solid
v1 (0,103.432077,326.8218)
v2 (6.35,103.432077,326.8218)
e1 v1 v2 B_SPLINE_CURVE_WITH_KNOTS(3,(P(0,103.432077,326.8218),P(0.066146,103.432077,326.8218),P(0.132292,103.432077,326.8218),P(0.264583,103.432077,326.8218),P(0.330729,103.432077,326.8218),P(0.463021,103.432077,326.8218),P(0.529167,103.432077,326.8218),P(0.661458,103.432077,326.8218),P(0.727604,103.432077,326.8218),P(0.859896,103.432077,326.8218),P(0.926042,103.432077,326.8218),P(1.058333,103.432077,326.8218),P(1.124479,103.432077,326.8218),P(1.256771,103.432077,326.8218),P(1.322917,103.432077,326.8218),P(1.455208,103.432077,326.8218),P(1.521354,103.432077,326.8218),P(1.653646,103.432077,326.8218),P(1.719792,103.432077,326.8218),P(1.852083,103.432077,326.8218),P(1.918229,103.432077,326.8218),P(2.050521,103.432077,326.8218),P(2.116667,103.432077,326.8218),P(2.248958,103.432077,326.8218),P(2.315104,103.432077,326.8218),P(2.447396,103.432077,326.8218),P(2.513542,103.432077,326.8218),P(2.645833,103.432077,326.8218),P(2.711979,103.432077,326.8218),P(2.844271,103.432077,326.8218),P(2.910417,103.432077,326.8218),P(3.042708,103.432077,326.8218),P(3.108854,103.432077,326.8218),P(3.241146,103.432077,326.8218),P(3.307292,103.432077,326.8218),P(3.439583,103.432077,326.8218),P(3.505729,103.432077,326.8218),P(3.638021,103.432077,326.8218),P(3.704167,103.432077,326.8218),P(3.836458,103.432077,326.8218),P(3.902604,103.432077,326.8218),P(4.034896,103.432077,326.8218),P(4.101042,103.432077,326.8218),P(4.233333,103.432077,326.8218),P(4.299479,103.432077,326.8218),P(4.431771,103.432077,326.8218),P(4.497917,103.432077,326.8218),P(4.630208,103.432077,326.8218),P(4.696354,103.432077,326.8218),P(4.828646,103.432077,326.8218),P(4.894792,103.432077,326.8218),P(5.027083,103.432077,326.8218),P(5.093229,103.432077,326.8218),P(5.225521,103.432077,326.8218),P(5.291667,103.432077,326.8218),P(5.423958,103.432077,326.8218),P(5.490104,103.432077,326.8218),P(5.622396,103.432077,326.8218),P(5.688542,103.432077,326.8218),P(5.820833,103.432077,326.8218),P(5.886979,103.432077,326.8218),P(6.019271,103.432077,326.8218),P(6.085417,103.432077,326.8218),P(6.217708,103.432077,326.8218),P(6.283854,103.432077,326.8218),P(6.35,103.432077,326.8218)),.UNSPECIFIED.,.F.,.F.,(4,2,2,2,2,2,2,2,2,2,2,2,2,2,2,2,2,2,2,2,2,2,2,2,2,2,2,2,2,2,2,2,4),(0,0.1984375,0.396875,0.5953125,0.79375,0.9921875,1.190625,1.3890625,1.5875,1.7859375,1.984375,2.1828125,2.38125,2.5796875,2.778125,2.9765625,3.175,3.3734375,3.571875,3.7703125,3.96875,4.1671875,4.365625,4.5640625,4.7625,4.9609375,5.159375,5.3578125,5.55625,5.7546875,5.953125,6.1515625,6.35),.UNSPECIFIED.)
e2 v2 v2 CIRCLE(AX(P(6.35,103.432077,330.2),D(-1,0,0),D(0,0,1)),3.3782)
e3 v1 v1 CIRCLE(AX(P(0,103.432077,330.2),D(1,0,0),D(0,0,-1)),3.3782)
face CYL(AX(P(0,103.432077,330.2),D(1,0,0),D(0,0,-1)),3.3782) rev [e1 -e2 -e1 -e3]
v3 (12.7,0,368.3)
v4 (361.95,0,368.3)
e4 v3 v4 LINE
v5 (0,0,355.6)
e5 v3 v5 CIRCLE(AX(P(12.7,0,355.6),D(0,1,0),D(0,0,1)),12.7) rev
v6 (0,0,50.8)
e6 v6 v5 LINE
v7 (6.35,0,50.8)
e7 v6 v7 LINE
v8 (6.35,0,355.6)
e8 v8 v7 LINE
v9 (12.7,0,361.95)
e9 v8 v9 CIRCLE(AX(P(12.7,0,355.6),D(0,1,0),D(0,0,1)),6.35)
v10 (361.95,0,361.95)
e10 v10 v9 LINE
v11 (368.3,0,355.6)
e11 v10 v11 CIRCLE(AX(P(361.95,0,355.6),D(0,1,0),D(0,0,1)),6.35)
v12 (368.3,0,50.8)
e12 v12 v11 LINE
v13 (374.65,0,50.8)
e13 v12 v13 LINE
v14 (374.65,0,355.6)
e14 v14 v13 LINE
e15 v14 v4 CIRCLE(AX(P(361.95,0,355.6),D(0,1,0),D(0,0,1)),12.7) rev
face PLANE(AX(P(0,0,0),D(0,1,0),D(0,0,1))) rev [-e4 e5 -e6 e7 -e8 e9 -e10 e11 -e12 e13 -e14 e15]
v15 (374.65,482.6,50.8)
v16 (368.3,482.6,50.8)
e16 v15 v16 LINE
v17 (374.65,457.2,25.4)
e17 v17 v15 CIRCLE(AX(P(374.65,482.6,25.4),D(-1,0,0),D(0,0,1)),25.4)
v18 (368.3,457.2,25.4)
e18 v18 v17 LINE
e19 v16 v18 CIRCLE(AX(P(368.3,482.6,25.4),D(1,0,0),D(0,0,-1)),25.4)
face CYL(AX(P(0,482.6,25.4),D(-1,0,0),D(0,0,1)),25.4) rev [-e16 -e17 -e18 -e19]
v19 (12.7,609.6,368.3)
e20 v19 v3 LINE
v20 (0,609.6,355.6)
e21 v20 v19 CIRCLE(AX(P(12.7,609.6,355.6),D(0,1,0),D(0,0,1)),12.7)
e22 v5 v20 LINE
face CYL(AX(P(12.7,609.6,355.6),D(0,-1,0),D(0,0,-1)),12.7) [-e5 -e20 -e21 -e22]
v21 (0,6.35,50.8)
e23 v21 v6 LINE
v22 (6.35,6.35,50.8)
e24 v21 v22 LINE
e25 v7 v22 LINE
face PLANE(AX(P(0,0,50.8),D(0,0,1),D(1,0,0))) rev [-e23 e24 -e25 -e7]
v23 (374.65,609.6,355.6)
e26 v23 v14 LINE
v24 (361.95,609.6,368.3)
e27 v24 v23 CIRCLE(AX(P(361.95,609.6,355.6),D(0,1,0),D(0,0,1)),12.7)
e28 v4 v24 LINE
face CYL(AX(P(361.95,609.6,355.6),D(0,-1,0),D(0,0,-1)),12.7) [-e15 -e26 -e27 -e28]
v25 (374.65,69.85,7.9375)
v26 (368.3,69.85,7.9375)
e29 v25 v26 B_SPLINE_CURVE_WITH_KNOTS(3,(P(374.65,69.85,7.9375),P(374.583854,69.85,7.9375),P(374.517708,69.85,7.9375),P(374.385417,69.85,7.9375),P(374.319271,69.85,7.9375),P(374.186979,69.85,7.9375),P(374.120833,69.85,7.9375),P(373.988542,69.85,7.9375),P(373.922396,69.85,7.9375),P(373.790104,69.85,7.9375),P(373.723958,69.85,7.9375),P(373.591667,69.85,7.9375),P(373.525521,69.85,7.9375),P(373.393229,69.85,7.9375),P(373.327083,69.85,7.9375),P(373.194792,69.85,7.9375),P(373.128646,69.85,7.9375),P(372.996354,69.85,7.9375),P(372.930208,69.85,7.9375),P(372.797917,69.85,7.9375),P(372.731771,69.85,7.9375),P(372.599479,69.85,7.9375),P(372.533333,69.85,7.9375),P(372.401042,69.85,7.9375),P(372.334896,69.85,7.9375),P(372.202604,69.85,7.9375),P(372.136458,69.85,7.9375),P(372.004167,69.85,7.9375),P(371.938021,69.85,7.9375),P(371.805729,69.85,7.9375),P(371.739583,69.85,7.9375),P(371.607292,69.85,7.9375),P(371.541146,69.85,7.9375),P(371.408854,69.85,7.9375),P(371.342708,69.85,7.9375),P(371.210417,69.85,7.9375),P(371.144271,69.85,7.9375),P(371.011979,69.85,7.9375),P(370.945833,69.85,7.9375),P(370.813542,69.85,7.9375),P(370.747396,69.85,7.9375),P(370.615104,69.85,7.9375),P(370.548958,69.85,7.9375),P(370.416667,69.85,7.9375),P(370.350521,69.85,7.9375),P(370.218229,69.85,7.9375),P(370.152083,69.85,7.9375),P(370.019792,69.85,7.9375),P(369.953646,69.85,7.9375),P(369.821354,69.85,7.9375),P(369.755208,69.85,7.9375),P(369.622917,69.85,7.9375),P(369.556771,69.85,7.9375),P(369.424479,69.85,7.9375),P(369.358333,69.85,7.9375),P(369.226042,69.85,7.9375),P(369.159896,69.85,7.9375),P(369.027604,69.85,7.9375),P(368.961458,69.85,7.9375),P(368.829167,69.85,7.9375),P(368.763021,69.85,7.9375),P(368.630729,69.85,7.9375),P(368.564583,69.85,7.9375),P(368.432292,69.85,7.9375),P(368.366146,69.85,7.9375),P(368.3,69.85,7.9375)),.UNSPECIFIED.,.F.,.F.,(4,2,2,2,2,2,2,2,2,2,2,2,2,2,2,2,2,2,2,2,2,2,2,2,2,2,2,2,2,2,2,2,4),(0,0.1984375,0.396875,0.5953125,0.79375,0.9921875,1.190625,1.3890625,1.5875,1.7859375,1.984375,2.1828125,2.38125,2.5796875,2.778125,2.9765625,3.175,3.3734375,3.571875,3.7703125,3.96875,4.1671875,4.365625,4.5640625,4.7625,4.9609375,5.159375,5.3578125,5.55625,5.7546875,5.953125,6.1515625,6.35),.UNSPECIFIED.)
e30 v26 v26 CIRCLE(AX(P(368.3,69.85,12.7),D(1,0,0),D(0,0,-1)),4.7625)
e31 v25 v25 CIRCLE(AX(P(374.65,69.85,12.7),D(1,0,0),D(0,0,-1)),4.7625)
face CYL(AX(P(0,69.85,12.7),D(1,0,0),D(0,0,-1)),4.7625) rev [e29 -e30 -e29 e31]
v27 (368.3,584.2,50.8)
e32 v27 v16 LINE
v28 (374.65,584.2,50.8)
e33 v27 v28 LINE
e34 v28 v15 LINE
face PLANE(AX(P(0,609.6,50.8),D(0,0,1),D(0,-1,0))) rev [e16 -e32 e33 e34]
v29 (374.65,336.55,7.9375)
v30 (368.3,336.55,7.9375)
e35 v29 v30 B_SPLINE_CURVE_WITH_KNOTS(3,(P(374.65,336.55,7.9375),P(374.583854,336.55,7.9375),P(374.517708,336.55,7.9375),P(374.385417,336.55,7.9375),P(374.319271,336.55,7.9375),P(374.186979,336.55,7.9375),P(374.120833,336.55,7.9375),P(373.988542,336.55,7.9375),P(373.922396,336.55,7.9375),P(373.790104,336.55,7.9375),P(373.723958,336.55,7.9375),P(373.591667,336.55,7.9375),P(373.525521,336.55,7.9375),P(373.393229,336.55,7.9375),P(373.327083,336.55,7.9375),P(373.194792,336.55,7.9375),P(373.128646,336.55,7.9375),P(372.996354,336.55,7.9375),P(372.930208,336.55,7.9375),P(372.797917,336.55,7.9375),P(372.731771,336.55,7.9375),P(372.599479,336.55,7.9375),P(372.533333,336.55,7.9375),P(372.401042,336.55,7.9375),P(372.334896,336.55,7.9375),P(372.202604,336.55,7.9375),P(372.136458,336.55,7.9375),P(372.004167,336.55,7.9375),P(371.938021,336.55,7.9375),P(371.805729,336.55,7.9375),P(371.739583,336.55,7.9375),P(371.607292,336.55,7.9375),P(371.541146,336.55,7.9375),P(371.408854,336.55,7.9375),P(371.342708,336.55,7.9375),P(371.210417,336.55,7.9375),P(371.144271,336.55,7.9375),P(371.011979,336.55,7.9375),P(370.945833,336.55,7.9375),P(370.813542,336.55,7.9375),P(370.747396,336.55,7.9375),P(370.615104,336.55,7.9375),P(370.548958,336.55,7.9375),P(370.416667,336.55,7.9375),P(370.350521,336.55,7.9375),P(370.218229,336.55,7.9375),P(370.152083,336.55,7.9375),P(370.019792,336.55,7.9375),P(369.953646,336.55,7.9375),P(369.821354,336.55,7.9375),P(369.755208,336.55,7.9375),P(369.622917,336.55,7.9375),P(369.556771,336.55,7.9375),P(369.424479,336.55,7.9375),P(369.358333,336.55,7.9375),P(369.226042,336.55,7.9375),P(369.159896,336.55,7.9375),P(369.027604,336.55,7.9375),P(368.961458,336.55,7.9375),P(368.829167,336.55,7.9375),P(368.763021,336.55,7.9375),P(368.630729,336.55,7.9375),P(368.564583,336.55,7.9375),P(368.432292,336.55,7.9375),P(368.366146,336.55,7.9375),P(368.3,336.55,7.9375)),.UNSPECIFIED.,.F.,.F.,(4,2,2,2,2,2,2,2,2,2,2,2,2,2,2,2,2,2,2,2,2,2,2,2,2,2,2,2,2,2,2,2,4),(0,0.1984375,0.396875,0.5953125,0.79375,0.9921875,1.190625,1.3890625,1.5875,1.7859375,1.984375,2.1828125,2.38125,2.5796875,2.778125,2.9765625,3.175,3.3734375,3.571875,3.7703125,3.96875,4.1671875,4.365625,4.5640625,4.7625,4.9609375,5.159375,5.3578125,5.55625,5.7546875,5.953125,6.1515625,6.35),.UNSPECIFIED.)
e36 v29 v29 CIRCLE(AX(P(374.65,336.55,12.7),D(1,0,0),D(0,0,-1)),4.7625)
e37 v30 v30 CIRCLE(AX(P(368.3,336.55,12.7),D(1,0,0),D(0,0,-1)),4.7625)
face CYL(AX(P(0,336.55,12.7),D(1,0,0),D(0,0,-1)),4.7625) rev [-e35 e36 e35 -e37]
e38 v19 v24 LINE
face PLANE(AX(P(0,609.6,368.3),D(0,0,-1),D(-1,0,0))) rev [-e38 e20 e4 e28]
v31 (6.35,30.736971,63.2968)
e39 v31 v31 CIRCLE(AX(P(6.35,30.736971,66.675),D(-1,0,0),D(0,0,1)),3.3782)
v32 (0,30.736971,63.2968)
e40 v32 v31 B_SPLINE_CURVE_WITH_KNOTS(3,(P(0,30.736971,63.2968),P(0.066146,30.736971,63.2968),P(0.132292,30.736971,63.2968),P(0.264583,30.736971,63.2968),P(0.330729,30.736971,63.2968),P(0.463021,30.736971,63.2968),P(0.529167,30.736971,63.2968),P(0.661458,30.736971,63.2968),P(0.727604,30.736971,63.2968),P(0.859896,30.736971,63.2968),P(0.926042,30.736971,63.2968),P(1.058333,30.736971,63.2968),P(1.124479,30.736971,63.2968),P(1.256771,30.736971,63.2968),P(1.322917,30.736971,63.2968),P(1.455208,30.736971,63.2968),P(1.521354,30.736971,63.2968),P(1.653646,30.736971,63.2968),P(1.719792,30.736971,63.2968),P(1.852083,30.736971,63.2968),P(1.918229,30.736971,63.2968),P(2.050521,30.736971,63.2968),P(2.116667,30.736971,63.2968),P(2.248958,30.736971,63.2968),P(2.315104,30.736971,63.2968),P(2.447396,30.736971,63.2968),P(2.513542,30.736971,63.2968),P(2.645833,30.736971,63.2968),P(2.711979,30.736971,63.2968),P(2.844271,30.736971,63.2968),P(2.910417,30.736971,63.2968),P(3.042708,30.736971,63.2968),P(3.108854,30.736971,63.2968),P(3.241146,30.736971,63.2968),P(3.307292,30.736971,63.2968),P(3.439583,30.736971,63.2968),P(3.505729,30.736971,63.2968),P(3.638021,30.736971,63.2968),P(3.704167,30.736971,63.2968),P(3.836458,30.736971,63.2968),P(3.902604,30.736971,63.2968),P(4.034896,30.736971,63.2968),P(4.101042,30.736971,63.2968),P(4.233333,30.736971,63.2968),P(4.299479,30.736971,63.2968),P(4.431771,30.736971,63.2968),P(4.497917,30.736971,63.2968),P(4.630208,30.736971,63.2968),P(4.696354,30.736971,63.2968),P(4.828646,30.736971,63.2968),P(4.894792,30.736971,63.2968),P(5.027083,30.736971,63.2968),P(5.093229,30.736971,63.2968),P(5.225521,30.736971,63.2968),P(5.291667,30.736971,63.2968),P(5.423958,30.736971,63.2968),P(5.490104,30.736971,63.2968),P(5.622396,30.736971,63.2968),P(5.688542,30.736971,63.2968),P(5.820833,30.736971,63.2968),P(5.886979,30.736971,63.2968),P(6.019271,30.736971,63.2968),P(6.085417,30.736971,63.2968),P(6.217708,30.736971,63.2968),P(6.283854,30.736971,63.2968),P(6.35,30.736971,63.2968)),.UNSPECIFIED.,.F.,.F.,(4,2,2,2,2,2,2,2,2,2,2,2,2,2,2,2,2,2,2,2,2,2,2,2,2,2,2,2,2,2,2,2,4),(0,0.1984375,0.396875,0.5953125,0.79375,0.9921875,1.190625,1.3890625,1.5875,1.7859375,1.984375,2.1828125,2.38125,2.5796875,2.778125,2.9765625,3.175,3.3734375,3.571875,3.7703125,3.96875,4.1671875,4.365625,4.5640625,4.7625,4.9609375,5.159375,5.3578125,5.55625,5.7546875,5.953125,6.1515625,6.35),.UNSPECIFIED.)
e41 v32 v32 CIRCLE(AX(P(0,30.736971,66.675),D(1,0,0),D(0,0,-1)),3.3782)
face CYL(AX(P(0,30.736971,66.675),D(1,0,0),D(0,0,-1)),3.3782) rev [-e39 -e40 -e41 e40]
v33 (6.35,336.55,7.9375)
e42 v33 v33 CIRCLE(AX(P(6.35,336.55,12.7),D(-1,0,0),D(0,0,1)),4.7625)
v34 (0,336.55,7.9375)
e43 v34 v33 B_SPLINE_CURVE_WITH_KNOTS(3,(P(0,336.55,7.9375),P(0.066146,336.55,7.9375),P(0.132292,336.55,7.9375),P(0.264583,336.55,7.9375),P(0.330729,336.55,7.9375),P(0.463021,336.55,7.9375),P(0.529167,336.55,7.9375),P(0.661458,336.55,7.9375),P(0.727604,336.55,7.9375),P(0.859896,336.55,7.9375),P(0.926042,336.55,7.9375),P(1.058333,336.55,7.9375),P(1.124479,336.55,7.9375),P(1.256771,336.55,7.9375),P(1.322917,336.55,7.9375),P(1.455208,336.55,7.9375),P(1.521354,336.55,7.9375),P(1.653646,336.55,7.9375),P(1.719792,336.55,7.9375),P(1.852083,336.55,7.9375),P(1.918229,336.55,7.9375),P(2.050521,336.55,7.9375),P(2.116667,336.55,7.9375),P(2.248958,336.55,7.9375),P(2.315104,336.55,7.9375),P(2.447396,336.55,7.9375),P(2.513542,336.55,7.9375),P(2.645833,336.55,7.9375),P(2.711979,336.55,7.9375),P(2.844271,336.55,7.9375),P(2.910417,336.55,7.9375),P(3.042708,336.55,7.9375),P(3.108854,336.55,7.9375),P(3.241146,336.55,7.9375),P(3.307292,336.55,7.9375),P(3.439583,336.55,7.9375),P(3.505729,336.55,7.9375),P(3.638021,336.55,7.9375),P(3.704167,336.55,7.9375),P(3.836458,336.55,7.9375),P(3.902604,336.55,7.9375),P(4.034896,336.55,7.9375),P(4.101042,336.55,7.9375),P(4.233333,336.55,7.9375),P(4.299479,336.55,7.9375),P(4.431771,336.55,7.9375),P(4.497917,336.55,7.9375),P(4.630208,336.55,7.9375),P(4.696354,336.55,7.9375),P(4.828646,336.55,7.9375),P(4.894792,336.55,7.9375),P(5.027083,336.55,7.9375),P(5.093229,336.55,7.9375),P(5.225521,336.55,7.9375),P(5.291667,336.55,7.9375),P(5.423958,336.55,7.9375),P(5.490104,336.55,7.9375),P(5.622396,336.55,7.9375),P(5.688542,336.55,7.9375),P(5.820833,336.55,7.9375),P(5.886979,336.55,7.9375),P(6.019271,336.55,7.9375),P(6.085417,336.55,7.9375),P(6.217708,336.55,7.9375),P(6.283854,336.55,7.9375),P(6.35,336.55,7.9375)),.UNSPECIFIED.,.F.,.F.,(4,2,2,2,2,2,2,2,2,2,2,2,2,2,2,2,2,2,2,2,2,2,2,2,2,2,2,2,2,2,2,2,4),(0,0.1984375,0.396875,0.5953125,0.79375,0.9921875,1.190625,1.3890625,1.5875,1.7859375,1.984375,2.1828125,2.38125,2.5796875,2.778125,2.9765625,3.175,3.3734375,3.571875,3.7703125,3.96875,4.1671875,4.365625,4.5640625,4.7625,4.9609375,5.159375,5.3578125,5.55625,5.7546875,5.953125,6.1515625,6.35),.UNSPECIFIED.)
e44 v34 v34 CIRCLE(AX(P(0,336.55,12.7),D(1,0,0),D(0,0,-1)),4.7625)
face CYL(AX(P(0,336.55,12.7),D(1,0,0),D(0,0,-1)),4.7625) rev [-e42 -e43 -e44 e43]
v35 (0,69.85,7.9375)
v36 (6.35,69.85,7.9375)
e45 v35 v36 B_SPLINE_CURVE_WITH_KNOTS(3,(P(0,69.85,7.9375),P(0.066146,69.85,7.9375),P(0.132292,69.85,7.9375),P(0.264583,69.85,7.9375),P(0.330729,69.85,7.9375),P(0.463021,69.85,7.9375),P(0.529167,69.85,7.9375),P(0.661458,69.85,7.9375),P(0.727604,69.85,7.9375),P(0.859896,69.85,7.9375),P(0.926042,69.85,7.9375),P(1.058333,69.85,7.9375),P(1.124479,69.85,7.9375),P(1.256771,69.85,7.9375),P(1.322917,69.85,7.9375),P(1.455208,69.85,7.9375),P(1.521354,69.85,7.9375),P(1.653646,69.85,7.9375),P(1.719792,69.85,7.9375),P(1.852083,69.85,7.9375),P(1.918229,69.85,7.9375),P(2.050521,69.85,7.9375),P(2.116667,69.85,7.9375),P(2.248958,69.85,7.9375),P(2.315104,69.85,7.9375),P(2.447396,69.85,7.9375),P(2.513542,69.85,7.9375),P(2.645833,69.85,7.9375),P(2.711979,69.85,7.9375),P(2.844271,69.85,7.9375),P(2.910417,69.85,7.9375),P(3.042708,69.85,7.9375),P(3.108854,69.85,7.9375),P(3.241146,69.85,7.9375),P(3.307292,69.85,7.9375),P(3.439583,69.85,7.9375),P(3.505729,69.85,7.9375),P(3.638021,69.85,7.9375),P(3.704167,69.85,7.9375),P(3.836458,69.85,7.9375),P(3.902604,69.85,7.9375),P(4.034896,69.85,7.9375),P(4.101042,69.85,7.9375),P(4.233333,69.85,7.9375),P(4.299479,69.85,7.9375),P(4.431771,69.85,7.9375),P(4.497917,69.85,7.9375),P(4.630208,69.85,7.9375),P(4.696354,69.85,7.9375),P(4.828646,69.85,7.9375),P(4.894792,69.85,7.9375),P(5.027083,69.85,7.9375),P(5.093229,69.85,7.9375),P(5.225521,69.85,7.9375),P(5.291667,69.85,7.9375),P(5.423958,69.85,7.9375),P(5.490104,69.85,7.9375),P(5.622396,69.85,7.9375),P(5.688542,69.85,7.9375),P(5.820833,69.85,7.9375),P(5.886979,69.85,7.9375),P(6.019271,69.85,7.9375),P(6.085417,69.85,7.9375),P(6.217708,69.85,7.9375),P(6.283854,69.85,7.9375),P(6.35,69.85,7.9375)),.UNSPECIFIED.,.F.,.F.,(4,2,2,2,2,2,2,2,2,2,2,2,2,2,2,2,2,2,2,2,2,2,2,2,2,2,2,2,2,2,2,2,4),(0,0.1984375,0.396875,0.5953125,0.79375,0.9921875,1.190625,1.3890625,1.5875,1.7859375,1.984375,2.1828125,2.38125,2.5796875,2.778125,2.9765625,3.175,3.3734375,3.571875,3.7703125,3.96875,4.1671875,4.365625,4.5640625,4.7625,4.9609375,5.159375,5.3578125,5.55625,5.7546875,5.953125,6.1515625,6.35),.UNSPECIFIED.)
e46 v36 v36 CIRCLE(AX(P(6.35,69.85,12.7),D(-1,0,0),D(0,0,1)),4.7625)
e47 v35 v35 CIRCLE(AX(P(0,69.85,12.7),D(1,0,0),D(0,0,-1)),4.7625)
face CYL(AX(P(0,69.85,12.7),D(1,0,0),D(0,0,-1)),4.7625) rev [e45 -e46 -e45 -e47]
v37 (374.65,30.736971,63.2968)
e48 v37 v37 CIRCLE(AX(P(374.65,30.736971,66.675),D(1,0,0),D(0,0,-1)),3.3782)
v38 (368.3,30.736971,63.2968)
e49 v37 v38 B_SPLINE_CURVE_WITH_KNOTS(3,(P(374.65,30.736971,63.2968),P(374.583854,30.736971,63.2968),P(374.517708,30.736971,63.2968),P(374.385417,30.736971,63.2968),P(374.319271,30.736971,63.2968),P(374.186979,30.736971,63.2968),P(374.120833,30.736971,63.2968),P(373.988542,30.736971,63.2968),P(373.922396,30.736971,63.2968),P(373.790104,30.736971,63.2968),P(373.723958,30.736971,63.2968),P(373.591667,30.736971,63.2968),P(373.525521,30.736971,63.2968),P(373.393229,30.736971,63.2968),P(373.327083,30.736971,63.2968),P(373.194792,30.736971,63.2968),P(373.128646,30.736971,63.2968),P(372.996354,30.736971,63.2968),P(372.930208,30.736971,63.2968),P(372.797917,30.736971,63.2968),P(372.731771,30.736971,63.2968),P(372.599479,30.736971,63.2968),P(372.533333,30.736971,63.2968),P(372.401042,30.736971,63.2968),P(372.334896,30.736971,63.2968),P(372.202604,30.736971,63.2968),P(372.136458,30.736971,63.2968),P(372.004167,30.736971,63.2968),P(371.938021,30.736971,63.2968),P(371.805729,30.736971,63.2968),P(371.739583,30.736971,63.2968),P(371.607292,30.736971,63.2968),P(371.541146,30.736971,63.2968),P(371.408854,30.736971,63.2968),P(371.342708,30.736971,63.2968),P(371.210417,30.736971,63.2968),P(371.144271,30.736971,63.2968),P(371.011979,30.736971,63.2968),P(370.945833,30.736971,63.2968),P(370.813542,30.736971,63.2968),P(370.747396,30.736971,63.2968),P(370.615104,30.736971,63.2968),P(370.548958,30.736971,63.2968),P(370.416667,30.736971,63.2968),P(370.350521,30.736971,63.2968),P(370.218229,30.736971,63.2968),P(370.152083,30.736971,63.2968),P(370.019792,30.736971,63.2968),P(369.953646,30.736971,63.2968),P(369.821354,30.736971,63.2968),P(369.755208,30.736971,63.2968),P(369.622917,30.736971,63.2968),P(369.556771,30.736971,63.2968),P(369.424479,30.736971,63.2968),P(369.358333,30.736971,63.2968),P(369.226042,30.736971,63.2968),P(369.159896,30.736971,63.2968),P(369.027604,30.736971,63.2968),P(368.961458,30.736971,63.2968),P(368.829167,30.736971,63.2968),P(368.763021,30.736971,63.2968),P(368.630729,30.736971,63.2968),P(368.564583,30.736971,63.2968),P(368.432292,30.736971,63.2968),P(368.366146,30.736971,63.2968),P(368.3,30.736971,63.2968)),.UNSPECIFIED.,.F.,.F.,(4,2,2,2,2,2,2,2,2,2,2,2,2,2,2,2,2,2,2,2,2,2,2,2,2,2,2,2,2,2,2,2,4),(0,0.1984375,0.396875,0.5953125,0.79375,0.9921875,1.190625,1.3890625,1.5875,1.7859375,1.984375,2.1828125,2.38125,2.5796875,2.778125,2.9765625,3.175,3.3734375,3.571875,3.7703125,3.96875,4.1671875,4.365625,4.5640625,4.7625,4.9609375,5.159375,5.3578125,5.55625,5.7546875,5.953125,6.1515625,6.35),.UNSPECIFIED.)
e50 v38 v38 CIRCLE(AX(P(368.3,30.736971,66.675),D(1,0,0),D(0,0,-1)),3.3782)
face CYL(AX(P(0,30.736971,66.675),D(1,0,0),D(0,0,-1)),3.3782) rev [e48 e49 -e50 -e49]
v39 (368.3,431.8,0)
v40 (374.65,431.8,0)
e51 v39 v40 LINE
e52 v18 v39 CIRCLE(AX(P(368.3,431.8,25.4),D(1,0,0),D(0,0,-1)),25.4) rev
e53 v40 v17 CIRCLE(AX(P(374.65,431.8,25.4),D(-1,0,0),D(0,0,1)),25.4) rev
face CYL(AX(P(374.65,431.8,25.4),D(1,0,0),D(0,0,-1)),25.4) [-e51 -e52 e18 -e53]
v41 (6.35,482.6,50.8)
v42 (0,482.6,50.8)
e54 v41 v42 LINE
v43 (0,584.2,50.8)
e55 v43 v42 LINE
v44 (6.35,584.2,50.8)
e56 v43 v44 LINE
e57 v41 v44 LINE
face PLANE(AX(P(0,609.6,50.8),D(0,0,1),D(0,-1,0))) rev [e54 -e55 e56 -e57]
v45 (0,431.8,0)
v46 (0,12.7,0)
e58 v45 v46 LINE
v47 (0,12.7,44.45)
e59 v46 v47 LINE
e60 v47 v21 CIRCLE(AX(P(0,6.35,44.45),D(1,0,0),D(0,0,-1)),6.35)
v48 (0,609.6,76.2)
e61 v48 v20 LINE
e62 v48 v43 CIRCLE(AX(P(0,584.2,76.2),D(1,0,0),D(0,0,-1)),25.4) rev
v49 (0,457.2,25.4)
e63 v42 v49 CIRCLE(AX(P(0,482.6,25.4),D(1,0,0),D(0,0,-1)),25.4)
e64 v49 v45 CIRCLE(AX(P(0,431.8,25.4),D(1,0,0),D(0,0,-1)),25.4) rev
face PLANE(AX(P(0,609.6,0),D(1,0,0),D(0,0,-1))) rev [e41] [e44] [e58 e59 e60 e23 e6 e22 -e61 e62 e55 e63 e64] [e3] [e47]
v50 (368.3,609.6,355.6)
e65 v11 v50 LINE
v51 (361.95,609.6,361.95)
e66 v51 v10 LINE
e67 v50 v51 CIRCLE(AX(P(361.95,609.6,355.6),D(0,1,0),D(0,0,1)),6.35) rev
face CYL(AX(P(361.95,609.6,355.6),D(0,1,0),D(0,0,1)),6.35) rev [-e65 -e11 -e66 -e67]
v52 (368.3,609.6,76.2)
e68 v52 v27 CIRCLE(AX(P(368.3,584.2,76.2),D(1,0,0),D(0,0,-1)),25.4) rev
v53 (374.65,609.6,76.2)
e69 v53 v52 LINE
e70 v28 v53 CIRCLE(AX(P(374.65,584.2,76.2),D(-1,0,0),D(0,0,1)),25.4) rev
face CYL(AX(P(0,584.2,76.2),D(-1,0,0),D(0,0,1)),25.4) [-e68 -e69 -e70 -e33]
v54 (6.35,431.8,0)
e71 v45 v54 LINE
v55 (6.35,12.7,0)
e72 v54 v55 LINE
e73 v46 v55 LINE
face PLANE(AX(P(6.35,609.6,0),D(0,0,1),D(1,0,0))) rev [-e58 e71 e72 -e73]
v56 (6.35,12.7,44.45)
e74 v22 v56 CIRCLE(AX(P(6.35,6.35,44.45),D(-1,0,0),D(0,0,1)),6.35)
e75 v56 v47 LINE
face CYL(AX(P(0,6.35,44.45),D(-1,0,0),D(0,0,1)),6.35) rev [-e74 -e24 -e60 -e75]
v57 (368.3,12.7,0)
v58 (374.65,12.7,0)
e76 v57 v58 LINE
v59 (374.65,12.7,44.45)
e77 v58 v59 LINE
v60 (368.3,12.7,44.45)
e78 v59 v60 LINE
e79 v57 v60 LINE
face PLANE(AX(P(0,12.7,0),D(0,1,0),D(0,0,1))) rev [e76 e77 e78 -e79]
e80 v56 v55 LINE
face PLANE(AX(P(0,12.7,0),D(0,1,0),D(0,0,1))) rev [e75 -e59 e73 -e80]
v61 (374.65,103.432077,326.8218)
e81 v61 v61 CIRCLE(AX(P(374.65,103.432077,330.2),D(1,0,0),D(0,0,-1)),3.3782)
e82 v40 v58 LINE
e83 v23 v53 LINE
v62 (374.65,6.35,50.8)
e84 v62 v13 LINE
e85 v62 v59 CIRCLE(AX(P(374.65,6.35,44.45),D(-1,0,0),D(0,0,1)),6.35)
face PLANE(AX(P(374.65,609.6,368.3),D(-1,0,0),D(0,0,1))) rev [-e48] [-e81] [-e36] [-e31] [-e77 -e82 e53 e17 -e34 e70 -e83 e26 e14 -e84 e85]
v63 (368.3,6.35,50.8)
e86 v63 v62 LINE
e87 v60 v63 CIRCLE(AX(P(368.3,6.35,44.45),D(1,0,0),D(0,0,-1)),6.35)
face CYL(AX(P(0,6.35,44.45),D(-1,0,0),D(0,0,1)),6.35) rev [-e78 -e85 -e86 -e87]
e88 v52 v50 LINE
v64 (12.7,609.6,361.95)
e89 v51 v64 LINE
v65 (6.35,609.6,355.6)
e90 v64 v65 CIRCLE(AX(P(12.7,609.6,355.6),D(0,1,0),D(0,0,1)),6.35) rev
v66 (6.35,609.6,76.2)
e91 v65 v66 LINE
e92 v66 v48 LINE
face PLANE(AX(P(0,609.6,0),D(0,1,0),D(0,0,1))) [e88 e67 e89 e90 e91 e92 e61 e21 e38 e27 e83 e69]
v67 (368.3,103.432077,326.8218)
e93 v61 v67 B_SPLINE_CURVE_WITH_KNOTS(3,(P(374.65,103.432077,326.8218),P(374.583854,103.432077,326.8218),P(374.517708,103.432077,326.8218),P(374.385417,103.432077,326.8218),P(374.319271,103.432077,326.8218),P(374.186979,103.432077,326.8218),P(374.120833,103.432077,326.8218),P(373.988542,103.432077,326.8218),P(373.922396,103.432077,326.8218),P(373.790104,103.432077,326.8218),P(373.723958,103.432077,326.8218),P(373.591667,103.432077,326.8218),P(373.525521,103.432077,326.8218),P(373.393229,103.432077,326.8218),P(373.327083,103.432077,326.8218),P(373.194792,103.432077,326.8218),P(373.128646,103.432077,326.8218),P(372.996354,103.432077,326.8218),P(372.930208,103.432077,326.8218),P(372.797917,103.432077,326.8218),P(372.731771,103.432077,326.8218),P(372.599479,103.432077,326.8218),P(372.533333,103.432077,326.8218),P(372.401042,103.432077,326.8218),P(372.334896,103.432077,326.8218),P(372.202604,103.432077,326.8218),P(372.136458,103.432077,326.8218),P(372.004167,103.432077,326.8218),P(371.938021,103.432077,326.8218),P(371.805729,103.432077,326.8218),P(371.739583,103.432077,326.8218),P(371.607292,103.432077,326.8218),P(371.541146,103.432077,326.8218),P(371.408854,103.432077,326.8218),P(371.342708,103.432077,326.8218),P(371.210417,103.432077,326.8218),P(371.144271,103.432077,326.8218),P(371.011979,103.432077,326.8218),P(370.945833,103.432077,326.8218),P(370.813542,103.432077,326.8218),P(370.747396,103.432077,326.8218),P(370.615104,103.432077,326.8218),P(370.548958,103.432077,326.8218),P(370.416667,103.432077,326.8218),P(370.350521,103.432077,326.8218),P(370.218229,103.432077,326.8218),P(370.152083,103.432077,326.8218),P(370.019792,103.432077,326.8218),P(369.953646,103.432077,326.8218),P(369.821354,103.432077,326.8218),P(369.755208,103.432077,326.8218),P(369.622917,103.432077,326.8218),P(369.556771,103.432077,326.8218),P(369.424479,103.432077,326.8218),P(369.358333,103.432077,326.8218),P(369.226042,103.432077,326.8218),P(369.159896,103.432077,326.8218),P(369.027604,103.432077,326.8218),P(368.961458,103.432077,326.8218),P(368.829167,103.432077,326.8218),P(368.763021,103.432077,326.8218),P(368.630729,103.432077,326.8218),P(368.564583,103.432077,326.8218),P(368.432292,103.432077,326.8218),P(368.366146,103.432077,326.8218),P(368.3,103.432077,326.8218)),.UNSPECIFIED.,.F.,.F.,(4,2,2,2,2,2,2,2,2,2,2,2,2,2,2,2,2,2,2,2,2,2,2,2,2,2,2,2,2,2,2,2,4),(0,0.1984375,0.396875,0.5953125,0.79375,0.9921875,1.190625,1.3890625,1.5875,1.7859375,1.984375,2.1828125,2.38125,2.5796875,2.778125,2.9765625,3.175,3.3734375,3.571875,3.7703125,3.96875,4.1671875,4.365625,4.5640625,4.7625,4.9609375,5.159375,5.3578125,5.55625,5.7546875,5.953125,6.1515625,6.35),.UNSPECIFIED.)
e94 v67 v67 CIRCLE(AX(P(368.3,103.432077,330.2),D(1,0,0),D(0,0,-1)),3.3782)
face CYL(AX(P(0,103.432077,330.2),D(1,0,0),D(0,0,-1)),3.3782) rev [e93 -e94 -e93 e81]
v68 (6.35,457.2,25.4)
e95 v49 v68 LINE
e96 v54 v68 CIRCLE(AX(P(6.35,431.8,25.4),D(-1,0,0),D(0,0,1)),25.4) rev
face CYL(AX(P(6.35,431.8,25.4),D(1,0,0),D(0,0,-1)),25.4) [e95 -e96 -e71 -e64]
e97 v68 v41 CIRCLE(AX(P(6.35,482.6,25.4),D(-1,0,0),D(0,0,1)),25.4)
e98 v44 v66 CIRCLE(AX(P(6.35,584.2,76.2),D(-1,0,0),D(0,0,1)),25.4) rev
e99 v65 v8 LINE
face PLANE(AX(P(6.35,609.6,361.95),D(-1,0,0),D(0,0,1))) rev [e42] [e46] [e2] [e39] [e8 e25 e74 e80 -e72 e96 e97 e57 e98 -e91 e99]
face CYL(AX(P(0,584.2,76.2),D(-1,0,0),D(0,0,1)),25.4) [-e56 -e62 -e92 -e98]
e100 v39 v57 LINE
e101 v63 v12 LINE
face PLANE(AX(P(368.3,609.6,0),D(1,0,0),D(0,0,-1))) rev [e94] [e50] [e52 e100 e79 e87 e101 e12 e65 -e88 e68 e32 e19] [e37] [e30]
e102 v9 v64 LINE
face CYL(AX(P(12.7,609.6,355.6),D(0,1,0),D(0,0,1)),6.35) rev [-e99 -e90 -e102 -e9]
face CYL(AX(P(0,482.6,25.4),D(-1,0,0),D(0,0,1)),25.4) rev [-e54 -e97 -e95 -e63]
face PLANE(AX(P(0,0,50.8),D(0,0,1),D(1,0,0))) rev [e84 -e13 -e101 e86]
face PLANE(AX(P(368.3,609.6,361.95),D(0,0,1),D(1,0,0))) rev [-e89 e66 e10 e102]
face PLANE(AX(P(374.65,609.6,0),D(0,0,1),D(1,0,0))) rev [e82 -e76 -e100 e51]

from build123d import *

# Parameters (mm, degrees)
BOSS_EXTRUDE1_DEPTH = 609.6
FILLET1_R           = 6.35
FILLET2_R           = 12.7
SKETCH2_W           = 50.8
SKETCH2_H           = 12.7
CUT_EXTRUDE1_DEPTH  = 805.748204409
SKETCH4_W           = 50.8
SKETCH4_H           = 152.4
CUT_EXTRUDE2_DEPTH  = 805.748204409
SKETCH5_R           = 3.3782
CUT_EXTRUDE3_DEPTH  = 805.748204409
SKETCH6_R           = 4.7625
CUT_EXTRUDE4_DEPTH  = 805.748204409
FILLET3_R           = 25.4
FILLET4_R           = 6.35


with BuildPart() as part:
    # Sketch1 → Boss-Extrude1 (new body)
    with BuildSketch(Plane(origin=(0, 0, 0), x_dir=(1, 0, 0), z_dir=(0, 1, 0))):
        Polygon((0, 0), (0, -368.3), (374.65, -368.3), (374.65, 0), (368.3, 0), (368.3, -361.95), (6.35, -361.95), (6.35, 0), align=None)
    extrude(amount=BOSS_EXTRUDE1_DEPTH)

    # Fillet1
    fillet1_edges = [part.edges().sort_by_distance(p)[0] for p in [
        (6.35, 304.8, 361.95),
        (368.3, 304.8, 361.95),
    ]]
    fillet(fillet1_edges, radius=FILLET1_R)

    # Fillet2
    fillet2_edges = [part.edges().sort_by_distance(p)[0] for p in [
        (374.65, 304.8, 368.3),
        (0, 304.8, 368.3),
    ]]
    fillet(fillet2_edges, radius=FILLET2_R)

    # Sketch2 → Cut-Extrude1 (cut, through all)
    with BuildSketch(Plane(origin=(374.65, 0, 0), x_dir=(0, 0, -1), z_dir=(1, 0, 0))):
        with Locations((-25.4, 6.35)):
            Rectangle(SKETCH2_W, SKETCH2_H)
    extrude(amount=-CUT_EXTRUDE1_DEPTH, mode=Mode.SUBTRACT)

    # Sketch4 → Cut-Extrude2 (cut, through all)
    with BuildSketch(Plane(origin=(374.65, 0, 0), x_dir=(0, 0, -1), z_dir=(1, 0, 0))):
        with Locations((-25.4, 533.4)):
            Rectangle(SKETCH4_W, SKETCH4_H)
    extrude(amount=-CUT_EXTRUDE2_DEPTH, mode=Mode.SUBTRACT)

    # Sketch5 → Cut-Extrude3 (cut, through all)
    with BuildSketch(Plane(origin=(374.65, 0, 0), x_dir=(0, 0, -1), z_dir=(1, 0, 0))):
        with Locations((-330.2, 103.432077108)):
            Circle(SKETCH5_R)
        with Locations((-66.675, 30.736970621)):
            Circle(SKETCH5_R)
    extrude(amount=-CUT_EXTRUDE3_DEPTH, mode=Mode.SUBTRACT)

    # Sketch6 → Cut-Extrude4 (cut, through all)
    with BuildSketch(Plane(origin=(374.65, 0, 0), x_dir=(0, 0, -1), z_dir=(1, 0, 0))):
        with Locations((-12.7, 69.85)):
            Circle(SKETCH6_R)
        with Locations((-12.7, 336.55)):
            Circle(SKETCH6_R)
    extrude(amount=-CUT_EXTRUDE4_DEPTH, mode=Mode.SUBTRACT)

    # Fillet3
    fillet3_edges = [part.edges().sort_by_distance(p)[0] for p in [
        (3.175, 457.2, 0),
        (371.475, 457.2, 0),
        (371.475, 457.2, 50.8),
        (3.175, 457.2, 50.8),
        (3.175, 609.6, 50.8),
        (371.475, 609.6, 50.8),
    ]]
    fillet(fillet3_edges, radius=FILLET3_R - 0.0001)  # a hair under: the kernel refuses the full size

    # Fillet4
    fillet4_edges = [part.edges().sort_by_distance(p)[0] for p in [
        (371.475, 12.7, 50.8),
        (3.175, 12.7, 50.8),
    ]]
    fillet(fillet4_edges, radius=FILLET4_R)


solid = part.part
